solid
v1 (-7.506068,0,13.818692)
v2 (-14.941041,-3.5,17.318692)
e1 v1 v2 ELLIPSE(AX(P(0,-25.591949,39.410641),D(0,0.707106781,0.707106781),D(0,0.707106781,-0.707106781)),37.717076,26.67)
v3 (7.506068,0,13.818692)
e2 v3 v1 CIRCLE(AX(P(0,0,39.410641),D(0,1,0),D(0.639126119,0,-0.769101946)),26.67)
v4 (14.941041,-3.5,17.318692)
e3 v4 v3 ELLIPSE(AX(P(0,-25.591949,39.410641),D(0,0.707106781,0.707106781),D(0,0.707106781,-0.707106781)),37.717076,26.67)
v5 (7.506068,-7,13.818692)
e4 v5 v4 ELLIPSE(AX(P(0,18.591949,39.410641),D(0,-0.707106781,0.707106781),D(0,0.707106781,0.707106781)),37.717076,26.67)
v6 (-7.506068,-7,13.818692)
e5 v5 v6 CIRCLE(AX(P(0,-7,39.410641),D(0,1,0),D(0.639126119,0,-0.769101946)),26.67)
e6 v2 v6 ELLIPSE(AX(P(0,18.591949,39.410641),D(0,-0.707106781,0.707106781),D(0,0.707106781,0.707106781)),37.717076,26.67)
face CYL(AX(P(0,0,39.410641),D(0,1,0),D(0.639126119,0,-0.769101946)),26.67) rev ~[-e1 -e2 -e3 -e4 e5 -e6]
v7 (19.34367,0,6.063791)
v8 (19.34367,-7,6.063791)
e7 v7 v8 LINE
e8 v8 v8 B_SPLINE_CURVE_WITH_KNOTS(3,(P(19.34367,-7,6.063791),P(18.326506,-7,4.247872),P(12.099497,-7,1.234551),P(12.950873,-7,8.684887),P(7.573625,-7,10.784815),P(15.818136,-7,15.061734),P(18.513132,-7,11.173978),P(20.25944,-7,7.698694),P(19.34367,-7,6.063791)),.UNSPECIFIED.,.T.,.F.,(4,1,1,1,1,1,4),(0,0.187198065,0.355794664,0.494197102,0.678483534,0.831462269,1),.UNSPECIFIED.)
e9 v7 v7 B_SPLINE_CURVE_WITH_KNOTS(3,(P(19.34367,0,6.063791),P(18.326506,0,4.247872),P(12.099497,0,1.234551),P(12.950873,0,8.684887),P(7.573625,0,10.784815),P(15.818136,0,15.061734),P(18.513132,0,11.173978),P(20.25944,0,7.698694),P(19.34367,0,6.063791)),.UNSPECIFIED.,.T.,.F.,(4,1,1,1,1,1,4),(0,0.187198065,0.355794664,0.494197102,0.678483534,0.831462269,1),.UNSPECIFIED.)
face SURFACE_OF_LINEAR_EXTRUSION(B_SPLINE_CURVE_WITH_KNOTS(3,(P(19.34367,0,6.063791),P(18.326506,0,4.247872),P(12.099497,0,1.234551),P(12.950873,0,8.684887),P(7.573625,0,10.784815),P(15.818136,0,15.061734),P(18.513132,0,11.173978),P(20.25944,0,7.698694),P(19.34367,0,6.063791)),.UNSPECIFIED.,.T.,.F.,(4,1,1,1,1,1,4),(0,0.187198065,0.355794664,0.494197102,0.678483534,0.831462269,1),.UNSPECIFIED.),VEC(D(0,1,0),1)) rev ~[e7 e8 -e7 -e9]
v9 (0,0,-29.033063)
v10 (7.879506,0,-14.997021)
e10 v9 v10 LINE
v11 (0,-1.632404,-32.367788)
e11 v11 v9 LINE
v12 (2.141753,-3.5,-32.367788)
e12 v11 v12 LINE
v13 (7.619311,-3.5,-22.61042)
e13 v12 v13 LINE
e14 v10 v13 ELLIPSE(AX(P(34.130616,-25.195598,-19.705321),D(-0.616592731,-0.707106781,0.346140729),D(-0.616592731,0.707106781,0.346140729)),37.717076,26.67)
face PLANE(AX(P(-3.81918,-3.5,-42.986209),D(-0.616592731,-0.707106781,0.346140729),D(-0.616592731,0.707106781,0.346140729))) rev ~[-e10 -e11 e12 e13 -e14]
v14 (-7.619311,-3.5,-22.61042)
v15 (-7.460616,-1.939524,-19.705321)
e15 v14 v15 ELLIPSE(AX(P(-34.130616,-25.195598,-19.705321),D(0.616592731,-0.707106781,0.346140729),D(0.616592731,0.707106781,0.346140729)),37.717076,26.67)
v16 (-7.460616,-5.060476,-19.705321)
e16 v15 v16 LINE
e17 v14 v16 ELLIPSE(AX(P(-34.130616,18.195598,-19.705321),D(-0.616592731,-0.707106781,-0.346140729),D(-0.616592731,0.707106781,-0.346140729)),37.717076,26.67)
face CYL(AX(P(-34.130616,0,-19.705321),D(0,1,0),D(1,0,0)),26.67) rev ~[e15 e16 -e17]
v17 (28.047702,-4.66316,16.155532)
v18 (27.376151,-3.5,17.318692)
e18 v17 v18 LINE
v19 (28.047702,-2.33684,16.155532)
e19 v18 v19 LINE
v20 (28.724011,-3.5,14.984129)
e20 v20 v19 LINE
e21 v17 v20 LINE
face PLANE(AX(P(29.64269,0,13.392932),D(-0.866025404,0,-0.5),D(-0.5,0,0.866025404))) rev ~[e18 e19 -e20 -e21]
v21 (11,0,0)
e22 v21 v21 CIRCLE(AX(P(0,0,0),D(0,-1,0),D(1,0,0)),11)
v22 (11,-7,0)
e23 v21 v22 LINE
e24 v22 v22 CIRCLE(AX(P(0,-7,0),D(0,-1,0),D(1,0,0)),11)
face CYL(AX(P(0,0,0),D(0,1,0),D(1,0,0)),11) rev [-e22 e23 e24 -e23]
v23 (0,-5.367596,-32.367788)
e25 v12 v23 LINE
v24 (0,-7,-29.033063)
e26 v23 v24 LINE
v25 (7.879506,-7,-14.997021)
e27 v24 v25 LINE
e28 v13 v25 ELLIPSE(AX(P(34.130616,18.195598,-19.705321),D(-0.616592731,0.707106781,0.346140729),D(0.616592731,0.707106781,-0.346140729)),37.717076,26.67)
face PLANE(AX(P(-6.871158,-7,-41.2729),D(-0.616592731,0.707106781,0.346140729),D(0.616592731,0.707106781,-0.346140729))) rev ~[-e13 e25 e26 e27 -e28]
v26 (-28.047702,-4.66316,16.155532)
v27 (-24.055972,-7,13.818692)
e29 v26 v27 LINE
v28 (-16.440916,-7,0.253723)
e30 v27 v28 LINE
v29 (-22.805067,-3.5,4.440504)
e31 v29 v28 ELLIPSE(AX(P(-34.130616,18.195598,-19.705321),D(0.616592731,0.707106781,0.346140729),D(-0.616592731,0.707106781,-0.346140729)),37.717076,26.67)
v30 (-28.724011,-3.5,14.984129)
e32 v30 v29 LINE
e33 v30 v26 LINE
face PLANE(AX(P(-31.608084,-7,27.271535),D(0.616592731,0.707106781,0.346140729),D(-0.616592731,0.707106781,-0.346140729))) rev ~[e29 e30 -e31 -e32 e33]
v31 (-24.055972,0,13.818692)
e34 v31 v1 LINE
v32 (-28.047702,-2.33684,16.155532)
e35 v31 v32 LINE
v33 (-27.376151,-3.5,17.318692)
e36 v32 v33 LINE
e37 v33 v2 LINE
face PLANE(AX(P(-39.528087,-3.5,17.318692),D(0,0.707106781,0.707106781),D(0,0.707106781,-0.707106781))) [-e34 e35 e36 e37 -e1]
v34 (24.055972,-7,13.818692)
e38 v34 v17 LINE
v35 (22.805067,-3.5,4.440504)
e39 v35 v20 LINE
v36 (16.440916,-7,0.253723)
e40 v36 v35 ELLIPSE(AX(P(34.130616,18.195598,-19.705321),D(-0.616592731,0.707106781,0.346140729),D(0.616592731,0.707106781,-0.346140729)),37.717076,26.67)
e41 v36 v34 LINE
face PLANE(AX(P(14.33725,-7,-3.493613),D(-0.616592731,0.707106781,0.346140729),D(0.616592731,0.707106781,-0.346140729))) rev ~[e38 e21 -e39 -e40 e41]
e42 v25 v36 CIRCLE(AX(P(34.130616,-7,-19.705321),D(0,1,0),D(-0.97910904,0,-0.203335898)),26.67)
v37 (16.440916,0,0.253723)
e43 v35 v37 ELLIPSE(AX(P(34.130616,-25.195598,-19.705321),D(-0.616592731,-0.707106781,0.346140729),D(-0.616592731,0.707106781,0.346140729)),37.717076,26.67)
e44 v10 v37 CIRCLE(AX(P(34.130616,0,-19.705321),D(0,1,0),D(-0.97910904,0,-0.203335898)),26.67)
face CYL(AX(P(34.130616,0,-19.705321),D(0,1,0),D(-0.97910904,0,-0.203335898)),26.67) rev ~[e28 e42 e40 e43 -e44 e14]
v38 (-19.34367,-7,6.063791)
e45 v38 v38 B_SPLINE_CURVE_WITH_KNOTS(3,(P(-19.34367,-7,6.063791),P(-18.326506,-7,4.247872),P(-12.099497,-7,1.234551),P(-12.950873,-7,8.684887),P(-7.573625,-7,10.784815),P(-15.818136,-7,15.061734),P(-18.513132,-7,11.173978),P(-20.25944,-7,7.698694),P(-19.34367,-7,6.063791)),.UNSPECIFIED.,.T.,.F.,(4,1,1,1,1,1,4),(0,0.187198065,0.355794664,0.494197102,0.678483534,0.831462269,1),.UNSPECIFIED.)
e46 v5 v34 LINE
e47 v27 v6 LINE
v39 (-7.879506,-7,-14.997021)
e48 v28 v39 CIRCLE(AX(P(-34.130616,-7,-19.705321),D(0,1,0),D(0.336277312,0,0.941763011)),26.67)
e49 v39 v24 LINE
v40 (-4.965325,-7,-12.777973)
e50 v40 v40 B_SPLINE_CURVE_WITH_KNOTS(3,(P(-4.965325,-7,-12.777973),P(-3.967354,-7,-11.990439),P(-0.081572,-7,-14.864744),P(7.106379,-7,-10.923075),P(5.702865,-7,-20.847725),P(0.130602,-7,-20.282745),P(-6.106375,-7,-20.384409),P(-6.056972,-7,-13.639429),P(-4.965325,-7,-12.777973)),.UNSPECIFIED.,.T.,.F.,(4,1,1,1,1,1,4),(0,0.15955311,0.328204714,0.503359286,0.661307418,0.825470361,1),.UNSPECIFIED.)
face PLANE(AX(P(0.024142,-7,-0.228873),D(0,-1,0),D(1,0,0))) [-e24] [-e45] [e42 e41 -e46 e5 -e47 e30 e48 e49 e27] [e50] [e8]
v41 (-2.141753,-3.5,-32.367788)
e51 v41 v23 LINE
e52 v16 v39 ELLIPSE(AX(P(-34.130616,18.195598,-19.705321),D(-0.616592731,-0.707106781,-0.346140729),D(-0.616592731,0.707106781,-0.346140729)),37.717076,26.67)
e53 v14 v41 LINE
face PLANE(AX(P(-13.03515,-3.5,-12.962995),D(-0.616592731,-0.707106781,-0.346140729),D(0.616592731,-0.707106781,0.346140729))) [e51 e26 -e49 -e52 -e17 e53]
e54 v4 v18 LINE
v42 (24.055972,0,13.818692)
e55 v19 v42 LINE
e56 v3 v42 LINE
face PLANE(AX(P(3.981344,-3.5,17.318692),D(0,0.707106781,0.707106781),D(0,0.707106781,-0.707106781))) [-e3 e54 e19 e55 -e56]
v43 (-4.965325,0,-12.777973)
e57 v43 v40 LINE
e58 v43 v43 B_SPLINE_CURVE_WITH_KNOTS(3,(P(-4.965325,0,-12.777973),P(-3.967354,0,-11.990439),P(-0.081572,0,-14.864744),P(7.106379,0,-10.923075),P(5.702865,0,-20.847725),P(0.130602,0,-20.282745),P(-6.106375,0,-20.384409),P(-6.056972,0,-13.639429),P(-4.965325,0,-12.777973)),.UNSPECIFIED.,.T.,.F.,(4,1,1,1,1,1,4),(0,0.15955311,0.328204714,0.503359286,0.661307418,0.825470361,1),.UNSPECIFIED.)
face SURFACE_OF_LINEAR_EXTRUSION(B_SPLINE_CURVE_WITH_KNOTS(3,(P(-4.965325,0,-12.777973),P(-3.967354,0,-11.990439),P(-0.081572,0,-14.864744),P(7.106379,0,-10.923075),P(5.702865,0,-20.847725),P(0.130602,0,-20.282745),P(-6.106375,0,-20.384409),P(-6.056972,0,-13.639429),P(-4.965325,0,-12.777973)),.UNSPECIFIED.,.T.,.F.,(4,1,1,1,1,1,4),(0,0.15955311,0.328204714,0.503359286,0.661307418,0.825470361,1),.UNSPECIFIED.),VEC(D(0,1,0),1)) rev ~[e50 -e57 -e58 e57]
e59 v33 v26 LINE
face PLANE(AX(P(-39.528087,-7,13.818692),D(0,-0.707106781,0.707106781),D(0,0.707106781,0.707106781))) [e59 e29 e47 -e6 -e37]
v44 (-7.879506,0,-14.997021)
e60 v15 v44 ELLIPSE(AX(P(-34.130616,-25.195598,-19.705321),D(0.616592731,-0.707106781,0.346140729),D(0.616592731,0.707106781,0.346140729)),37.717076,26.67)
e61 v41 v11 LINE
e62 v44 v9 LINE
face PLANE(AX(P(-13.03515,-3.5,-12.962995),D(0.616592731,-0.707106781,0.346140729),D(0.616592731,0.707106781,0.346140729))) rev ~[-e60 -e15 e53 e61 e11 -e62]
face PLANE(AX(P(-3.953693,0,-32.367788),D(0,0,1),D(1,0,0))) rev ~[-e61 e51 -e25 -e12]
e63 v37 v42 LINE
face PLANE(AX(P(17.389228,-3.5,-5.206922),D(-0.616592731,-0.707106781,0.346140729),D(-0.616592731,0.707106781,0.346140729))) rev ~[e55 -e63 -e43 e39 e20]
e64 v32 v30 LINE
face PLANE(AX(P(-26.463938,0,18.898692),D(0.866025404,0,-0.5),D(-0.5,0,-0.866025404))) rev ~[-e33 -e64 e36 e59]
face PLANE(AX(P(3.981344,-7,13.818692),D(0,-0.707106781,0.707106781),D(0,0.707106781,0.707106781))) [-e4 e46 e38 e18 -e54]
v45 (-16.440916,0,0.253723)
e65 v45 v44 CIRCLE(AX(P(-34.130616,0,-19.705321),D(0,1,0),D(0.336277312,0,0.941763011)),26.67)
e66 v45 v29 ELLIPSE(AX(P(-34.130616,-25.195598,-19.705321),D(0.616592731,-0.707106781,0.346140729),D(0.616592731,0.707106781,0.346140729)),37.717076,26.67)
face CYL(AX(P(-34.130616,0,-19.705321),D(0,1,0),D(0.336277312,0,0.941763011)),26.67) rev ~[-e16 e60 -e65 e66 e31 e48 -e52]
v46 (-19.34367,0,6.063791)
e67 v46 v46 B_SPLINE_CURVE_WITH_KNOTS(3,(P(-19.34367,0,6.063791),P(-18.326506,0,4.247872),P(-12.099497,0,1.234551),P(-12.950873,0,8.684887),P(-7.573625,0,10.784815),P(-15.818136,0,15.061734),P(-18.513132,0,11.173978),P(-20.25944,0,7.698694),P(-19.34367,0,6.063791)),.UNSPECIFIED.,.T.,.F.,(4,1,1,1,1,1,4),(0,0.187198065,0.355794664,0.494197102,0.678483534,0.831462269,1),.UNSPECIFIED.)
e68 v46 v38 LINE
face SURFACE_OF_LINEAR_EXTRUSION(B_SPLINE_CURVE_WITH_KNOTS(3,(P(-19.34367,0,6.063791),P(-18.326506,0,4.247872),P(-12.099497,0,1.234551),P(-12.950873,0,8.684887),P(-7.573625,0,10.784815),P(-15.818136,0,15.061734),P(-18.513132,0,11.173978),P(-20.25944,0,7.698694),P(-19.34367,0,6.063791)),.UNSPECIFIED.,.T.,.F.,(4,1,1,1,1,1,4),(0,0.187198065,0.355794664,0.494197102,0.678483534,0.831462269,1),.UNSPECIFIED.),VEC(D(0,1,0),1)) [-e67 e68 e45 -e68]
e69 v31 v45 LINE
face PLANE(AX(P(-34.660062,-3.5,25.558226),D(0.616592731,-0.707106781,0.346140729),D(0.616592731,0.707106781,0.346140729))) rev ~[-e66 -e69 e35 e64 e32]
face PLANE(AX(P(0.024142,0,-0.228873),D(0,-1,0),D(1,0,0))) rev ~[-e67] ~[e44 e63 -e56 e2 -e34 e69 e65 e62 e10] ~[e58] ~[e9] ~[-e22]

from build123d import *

# Parameters (mm, degrees)
F0_R         = 11
F1_DEPTH     = 7
F2_T1_DEPTH  = 35.2813832436
F2_T3_DEPTH  = 35.5467430765
F2_T5_DEPTH  = 34.4305362998
F2_T7_DEPTH  = 34.4305362998
F2_T9_DEPTH  = 35.2813832436
F2_T11_DEPTH = 35.5467430765


# Not quite as in the source:
# - a fillet or chamfer that OpenCascade refuses, or shapes differently, is made with other operations: its cross-section is extruded or revolved along the edge and cut away or added


with BuildPart() as f1:
    # F0 (on Front) → F1 (new body)
    with BuildSketch(Plane.XZ):
        with BuildLine():
            Line((-8.017778225, -25.1282889185), (-3.9536927291, -32.3677882552))
            Line((-3.9536927291, -32.3677882552), (3.9536927291, -32.3677882552))
            Line((3.9536927291, -32.3677882552), (8.017778225, -25.1282889185))
            ThreePointArc((8.017778225, -25.1282889185), (10.8745416094, -6.6499044579), (25.1621004057, 5.4114989824))
            Line((25.1621004057, 5.4114989824), (29.6426898708, 13.3929315811))
            Line((29.6426898708, 13.3929315811), (26.4639375252, 18.8986921484))
            Line((26.4639375252, 18.8986921484), (17.0454936065, 18.8986921484))
            ThreePointArc((17.0454936065, 18.8986921484), (0, 12.7406410493), (-17.0454936065, 18.8986921484))
            Line((-17.0454936065, 18.8986921484), (-26.4639375252, 18.8986921484))
            Line((-26.4639375252, 18.8986921484), (-29.6426898708, 13.3929315811))
            Line((-29.6426898708, 13.3929315811), (-25.1621004057, 5.4114989824))
            ThreePointArc((-25.1621004057, 5.4114989824), (-12.3306252771, -4.3414248541), (-7.4606163281, -19.7053205246))
            ThreePointArc((-7.4606163281, -19.7053205246), (-7.6002724535, -22.4310780148), (-8.017778225, -25.1282889185))
        make_face()
        Circle(F0_R, mode=Mode.SUBTRACT)
        with BuildLine():
            add(Edge.make_bspline(
                [(-19.3436696139, 6.063790572), (-18.3265059586, 4.2478718705), (-12.0994972205, 1.2345505969), (-12.9508733301, 8.6848868215), (-7.5736250413, 10.7848154742), (-15.8181364049, 15.0617341011), (-18.5131317461, 11.1739776744), (-20.2594400544, 7.6986943169), (-19.3436696139, 6.063790572)],
                knots=[0, 0, 0, 0, 0.1871980652, 0.3557946644, 0.4941971016, 0.6784835343, 0.8314622689, 1, 1, 1, 1], degree=3))
        make_face(mode=Mode.SUBTRACT)
        with BuildLine():
            add(Edge.make_bspline(
                [(-4.9653253518, -12.7779729664), (-3.9673538813, -11.990438984), (-0.0815721197, -14.8647438543), (7.1063785889, -10.9230753891), (5.7028649477, -20.847724526), (0.130602412, -20.2827447937), (-6.1063753916, -20.3844092682), (-6.0569718905, -13.6394292017), (-4.9653253518, -12.7779729664)],
                knots=[0, 0, 0, 0, 0.1595531099, 0.3282047144, 0.5033592864, 0.6613074183, 0.8254703614, 1, 1, 1, 1], degree=3))
        make_face(mode=Mode.SUBTRACT)
        with BuildLine():
            add(Edge.make_bspline(
                [(19.3436696139, 6.063790572), (18.3265059586, 4.2478718705), (12.0994972205, 1.2345505969), (12.9508733301, 8.6848868215), (7.5736250413, 10.7848154742), (15.8181364049, 15.0617341011), (18.5131317461, 11.1739776744), (20.2594400544, 7.6986943169), (19.3436696139, 6.063790572)],
                knots=[0, 0, 0, 0, 0.1871980652, 0.3557946644, 0.4941971016, 0.6784835343, 0.8314622689, 1, 1, 1, 1], degree=3))
        make_face(mode=Mode.SUBTRACT)
    extrude(amount=F1_DEPTH)

    # F2: chamfer of 5.08 on 12 edges, made by hand

    # F2_s2 → F2_t1 (cut)
    with BuildSketch(Plane(origin=(-19.2151547034, 0, 34.2286351679), x_dir=(0, 1, 0), z_dir=(0.4895169129, 0, -0.8719938027))):
        Polygon((-7, -14.2121753414), (-1.92, -19.2921753414), (-7, -19.2921753414), align=None)
        Polygon((-5.08, -19.2921753414), (0, -14.2121753414), (0, -19.2921753414), align=None)
    extrude(amount=F2_T1_DEPTH, mode=Mode.SUBTRACT)

    # F2_s4 → F2_t3 (cut)
    with BuildSketch(Plane.YZ.offset(-39.5280871041)):
        Polygon((-7, 13.8186921484), (-1.92, 18.8986921484), (-7, 18.8986921484), align=None)
        Polygon((-5.08, 18.8986921484), (0, 13.8186921484), (0, 18.8986921484), align=None)
    extrude(amount=F2_T3_DEPTH, mode=Mode.SUBTRACT)

    # F2_s6 → F2_t5 (cut)
    with BuildSketch(Plane(origin=(-19.2640867811, 0, -34.3157996098), x_dir=(0, 1, 0), z_dir=(0.4895169129, 0, 0.8719938027))):
        Polygon((-7, -14.2121753414), (-1.92, -19.2921753414), (-7, -19.2921753414), align=None)
        Polygon((-5.08, -19.2921753414), (0, -14.2121753414), (0, -19.2921753414), align=None)
    extrude(amount=F2_T5_DEPTH, mode=Mode.SUBTRACT)

    # F2_s8 → F2_t7 (cut)
    with BuildSketch(Plane(origin=(2.4097569425, 0, -4.2925853318), x_dir=(0, 1, 0), z_dir=(0.4895169129, 0, -0.8719938027))):
        Polygon((-1.92, -19.2921753414), (-7, -14.2121753414), (-7, -19.2921753414), align=None)
        Polygon((-5.08, -19.2921753414), (0, -14.2121753414), (0, -19.2921753414), align=None)
    extrude(amount=F2_T7_DEPTH, mode=Mode.SUBTRACT)

    # F2_s10 → F2_t9 (cut)
    with BuildSketch(Plane(origin=(1.9443208955, 0, 3.4634876278), x_dir=(0, 1, 0), z_dir=(0.4895169129, 0, 0.8719938027))):
        Polygon((-7, -14.2121753414), (-1.92, -19.2921753414), (-7, -19.2921753414), align=None)
        Polygon((-5.08, -19.2921753414), (0, -14.2121753414), (0, -19.2921753414), align=None)
    extrude(amount=F2_T9_DEPTH, mode=Mode.SUBTRACT)

    # F2_s12 → F2_t11 (cut)
    with BuildSketch(Plane.YZ.offset(3.9813440276)):
        Polygon((-7, 13.8186921484), (-1.92, 18.8986921484), (-7, 18.8986921484), align=None)
        Polygon((-5.08, 18.8986921484), (0, 13.8186921484), (0, 18.8986921484), align=None)
    extrude(amount=F2_T11_DEPTH, mode=Mode.SUBTRACT)


solid = f1.part
